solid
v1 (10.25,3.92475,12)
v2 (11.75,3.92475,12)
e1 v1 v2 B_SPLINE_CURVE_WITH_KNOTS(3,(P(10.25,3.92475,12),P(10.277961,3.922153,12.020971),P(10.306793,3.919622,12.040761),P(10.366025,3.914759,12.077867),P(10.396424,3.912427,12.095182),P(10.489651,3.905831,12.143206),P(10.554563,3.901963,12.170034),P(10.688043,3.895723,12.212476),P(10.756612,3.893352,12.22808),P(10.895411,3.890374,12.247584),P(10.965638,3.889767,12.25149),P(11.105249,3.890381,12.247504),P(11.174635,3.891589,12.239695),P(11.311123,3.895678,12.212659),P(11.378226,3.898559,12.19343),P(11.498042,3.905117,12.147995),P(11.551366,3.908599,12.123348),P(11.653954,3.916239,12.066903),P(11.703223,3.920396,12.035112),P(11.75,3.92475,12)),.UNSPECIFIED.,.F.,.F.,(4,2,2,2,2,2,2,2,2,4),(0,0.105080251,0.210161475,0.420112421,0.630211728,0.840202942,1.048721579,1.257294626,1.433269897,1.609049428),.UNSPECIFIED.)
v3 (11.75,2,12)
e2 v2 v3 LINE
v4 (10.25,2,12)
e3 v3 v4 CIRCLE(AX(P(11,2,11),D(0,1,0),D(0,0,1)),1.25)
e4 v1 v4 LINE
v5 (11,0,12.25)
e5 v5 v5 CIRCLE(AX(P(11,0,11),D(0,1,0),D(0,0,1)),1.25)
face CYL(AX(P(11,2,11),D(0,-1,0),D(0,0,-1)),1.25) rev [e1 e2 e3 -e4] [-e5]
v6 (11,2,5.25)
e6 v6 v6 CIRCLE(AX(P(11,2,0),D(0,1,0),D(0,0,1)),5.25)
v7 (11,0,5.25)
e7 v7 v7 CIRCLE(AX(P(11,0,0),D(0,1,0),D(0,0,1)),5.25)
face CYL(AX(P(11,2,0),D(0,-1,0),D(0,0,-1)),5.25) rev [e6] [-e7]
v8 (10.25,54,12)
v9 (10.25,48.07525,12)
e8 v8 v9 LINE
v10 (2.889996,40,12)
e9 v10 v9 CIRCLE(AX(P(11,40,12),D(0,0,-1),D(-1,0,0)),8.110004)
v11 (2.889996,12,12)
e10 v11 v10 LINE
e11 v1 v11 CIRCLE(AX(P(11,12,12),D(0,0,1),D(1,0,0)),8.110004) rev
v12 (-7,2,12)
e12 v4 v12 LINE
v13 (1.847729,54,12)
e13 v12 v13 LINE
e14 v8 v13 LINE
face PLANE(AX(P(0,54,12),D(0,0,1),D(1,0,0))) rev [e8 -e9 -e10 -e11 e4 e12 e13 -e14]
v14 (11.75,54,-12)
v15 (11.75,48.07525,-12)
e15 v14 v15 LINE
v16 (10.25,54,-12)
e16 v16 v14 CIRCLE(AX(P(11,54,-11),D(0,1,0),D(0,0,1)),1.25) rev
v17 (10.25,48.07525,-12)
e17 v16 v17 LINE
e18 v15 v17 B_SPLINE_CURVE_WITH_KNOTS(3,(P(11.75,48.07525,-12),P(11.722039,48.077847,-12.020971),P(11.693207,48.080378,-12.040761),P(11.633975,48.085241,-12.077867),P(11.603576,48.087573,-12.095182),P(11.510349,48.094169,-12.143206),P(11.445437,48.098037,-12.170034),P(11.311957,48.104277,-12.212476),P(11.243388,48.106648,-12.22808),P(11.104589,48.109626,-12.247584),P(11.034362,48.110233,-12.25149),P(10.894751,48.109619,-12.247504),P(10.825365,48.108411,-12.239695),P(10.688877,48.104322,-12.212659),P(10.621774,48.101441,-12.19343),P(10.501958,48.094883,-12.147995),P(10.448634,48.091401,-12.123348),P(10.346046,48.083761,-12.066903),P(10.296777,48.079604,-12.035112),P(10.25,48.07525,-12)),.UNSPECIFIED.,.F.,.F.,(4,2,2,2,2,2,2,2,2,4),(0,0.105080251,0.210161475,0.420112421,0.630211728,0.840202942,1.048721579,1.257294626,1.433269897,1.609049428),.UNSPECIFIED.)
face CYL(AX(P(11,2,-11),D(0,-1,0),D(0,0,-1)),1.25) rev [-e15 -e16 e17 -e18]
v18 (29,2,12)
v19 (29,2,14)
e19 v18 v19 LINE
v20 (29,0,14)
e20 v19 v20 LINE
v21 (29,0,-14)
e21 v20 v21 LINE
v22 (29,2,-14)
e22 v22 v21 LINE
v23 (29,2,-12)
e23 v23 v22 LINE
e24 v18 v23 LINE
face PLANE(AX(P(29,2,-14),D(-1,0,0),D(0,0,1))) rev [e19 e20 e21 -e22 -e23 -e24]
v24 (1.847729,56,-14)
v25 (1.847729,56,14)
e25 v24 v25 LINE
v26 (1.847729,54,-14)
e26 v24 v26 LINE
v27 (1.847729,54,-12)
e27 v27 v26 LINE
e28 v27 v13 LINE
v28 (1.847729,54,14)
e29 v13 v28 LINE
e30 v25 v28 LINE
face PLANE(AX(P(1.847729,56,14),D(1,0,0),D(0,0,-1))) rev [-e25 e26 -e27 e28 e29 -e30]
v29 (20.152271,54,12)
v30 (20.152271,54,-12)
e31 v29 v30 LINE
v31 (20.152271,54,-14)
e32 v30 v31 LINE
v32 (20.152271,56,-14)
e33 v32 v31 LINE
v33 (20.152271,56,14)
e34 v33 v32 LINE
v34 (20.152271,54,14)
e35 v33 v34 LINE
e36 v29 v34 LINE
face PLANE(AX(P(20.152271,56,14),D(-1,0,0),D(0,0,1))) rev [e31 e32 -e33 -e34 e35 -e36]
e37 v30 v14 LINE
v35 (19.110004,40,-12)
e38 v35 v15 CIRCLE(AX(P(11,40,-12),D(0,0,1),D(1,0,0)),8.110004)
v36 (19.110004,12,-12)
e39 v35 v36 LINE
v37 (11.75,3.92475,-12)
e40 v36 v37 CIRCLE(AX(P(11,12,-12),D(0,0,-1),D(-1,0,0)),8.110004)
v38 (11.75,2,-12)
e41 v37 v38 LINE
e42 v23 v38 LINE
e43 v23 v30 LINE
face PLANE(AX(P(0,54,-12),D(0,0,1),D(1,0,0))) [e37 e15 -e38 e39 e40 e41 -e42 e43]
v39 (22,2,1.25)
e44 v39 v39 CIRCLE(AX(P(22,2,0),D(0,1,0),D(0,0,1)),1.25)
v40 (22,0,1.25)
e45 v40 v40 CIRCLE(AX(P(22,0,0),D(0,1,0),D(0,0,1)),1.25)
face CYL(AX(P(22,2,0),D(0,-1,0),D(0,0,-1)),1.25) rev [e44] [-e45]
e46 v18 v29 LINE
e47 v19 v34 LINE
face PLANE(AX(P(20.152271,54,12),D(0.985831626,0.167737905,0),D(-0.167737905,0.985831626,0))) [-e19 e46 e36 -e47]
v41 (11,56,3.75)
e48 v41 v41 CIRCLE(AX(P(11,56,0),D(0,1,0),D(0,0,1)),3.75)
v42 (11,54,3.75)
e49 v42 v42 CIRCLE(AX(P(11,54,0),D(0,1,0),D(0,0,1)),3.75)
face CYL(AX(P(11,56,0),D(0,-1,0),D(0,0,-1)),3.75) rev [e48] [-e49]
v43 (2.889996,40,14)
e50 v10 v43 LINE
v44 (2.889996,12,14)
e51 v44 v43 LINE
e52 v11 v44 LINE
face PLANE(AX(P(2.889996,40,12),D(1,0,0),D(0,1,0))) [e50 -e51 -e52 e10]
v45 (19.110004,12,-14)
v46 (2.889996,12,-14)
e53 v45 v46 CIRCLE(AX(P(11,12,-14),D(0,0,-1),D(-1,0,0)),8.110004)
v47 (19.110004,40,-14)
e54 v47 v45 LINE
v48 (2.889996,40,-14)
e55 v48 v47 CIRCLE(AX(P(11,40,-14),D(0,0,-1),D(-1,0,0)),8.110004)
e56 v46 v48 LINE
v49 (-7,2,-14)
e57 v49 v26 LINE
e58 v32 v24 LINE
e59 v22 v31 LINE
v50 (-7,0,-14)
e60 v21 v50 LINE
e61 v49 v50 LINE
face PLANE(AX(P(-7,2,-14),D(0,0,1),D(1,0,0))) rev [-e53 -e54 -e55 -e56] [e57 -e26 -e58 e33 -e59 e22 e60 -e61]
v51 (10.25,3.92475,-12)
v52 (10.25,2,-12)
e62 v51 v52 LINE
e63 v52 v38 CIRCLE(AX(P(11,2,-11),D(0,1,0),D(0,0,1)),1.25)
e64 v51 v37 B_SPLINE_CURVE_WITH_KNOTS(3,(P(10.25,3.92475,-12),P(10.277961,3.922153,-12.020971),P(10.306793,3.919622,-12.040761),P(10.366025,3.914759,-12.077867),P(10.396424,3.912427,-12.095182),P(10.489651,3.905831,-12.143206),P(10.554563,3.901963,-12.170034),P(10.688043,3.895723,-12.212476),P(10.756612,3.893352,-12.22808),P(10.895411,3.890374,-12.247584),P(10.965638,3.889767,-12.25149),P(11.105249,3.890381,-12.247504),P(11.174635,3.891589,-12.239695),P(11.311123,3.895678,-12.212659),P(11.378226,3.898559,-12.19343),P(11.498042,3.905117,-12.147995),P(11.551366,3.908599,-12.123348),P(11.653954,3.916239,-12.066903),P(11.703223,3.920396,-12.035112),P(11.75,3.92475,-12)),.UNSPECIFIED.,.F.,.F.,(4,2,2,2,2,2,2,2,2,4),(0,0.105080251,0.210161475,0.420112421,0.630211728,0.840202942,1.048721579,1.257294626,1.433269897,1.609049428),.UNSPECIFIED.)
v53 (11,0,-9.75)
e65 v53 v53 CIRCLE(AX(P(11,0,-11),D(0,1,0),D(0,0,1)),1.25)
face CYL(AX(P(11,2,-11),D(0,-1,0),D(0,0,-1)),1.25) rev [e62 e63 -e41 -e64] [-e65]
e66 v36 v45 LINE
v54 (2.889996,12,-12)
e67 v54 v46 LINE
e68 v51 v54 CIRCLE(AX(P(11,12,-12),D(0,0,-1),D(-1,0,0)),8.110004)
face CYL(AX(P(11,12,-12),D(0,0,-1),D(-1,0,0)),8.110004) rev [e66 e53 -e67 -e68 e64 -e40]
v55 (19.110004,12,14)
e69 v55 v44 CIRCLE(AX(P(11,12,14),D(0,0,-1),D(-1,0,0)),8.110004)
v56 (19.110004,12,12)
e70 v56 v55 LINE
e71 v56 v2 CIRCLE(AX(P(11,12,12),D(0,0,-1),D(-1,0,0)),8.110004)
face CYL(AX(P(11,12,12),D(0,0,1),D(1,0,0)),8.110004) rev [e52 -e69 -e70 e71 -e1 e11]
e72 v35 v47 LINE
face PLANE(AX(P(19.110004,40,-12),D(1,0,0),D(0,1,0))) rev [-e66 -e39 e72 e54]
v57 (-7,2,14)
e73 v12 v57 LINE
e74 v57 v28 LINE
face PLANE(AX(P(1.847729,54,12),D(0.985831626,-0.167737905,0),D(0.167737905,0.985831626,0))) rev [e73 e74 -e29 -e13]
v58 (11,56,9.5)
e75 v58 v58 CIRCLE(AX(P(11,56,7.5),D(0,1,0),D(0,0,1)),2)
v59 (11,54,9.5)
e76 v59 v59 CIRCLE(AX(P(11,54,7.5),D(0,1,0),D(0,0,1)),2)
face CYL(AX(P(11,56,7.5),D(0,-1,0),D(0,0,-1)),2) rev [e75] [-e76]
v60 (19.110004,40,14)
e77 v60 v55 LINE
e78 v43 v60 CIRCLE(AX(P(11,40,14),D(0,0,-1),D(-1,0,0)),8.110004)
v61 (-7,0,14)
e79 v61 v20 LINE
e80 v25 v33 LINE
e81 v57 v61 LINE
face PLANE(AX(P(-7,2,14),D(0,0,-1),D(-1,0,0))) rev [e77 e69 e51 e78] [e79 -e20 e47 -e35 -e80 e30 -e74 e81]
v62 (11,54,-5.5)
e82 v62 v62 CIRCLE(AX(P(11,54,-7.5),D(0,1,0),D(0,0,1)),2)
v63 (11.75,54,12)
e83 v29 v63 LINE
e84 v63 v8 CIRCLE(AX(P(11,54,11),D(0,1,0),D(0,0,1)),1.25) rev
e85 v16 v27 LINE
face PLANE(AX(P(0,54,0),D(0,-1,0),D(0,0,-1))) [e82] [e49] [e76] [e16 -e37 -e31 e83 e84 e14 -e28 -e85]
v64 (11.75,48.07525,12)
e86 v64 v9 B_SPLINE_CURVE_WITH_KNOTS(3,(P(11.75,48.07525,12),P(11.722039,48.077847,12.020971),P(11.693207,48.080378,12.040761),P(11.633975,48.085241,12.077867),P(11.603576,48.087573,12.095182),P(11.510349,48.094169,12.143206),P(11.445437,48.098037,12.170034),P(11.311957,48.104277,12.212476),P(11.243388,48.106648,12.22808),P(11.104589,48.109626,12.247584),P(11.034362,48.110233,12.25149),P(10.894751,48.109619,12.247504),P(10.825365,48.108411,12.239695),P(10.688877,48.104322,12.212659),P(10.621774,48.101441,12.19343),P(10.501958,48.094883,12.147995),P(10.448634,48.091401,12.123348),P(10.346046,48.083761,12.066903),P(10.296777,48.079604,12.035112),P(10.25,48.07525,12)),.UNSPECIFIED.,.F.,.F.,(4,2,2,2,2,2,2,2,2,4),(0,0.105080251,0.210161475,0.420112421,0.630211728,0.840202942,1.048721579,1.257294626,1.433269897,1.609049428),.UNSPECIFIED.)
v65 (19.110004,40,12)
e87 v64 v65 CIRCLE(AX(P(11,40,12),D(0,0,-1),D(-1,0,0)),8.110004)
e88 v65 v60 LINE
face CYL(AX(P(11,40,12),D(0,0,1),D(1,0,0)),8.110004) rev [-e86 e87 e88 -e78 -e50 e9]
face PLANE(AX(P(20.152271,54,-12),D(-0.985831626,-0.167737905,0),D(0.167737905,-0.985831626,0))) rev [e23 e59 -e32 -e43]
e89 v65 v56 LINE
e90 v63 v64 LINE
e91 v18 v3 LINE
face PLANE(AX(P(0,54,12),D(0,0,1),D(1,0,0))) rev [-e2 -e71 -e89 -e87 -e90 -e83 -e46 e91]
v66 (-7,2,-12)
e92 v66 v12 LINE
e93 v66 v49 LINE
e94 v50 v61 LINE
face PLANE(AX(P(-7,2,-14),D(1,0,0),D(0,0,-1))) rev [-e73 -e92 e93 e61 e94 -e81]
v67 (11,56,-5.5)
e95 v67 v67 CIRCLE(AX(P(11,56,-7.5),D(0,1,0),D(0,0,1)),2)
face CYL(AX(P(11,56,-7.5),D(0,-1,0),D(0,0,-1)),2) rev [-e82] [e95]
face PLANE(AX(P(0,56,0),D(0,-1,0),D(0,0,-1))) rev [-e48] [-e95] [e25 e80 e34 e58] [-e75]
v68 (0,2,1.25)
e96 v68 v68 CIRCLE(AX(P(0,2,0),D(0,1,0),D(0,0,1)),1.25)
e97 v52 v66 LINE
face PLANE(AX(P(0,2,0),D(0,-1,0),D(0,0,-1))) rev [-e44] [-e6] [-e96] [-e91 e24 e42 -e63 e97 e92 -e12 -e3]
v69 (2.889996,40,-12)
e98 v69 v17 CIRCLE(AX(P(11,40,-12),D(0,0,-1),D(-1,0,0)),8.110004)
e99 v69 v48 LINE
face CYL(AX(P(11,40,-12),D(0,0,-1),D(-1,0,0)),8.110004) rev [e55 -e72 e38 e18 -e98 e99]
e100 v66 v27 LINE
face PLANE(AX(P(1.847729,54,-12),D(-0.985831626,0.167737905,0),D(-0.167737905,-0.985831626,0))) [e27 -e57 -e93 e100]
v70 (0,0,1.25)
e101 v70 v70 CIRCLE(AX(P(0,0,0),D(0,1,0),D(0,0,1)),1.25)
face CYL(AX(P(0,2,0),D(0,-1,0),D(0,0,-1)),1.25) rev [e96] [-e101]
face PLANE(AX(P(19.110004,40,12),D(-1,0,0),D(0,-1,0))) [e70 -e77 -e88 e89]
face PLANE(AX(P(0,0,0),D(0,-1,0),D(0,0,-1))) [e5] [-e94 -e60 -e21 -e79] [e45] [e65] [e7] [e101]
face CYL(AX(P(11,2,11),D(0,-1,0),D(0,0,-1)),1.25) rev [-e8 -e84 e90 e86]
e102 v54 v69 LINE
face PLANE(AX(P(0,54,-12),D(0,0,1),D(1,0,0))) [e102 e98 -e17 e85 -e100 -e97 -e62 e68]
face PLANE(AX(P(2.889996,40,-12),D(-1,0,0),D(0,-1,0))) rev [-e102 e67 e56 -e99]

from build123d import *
from build123d.topology import SkipClean

# Parameters (mm, degrees)
SKETCH1_W            = 36
SKETCH1_H            = 28
SKETCH1_R            = 1.25
SKETCH1_R_2          = 5.25
BOSS_EXTRUDE1_DEPTH  = 2
BOSS_EXTRUDE2_DEPTH  = 52
CUT_EXTRUDE1_DEPTH   = 2
MIRROR2_COPY_1_DEPTH = 2
CUT_EXTRUDE2_DEPTH   = 2
SKETCH6_W            = 18.304542046
SKETCH6_H            = 28
SKETCH6_R            = 3.75
SKETCH6_R_2          = 2
BOSS_EXTRUDE3_DEPTH  = 2


# Read off the part's stored shape, not the designer's step: Boss-Extrude2
with BuildPart() as part:
    # Sketch1 → Boss-Extrude1 (new body)
    with BuildSketch(Plane(origin=(0, 0, 0), x_dir=(1, 0, 0), z_dir=(0, 1, 0))):
        with Locations((11, 0)):
            Rectangle(SKETCH1_W, SKETCH1_H)
        with Locations(Location((0, 0, 0), (0, 0, 270))):
            Circle(SKETCH1_R, mode=Mode.SUBTRACT)
        with Locations(Location((22, 0, 0), (0, 0, 270))):
            Circle(SKETCH1_R, mode=Mode.SUBTRACT)
        with Locations(Location((11, 11, 0), (0, 0, 270))):
            Circle(SKETCH1_R, mode=Mode.SUBTRACT)
        with Locations(Location((11, -11, 0), (0, 0, 270))):
            Circle(SKETCH1_R, mode=Mode.SUBTRACT)
        with Locations(Location((11, 0, 0), (0, 0, 270))):
            Circle(SKETCH1_R_2, mode=Mode.SUBTRACT)
    extrude(amount=BOSS_EXTRUDE1_DEPTH)

    # Boss-Extrude2 outline → Boss-Extrude2 (add)
    with SkipClean():  # the faces are left unmerged after this step: merging them gives an invalid solid
        with BuildSketch(Plane(origin=(0, 2, 0), x_dir=(1, 0, 0), z_dir=(0, 1, 0))):
            with BuildLine():
                Line((29, 14), (-7, 14))
                Line((-7, 14), (-7, 12))
                Line((-7, 12), (10.25, 12))
                ThreePointArc((10.25, 12), (11, 12.25), (11.75, 12))
                Line((11.75, 12), (29, 12))
                Line((29, 12), (29, 14))
            make_face()
            with BuildLine():
                Line((10.25, -12), (-7, -12))
                Line((-7, -12), (-7, -14))
                Line((-7, -14), (29, -14))
                Line((29, -14), (29, -12))
                Line((29, -12), (11.75, -12))
                ThreePointArc((11.75, -12), (11, -12.25), (10.25, -12))
            make_face()
        extrude(amount=BOSS_EXTRUDE2_DEPTH)

    # Sketch5 → Cut-Extrude1 (cut)
    with SkipClean():  # the faces are left unmerged after this step: merging them gives an invalid solid
        with BuildSketch(Plane(origin=(0, 0, -14), x_dir=(-1, 0, 0), z_dir=(0, 0, -1))):
            Polygon((-29, 54), (-20.152271023, 54), (-29, 2), align=None)
        cut_extrude1 = extrude(amount=-CUT_EXTRUDE1_DEPTH, mode=Mode.SUBTRACT)

    # Mirror1: Cut-Extrude1 across plane
    with SkipClean():  # the faces are left unmerged after this step: merging them gives an invalid solid
        add(cut_extrude1.mirror(Plane(origin=(11, 0, 0), x_dir=(0, 0, 1), z_dir=(1, 0, 0))), mode=Mode.SUBTRACT)

    # Mirror2: Cut-Extrude1 across plane
    with SkipClean():  # the faces are left unmerged after this step: merging them gives an invalid solid
        add(cut_extrude1.mirror(Plane(origin=(0, 0, 0), x_dir=(1, 0, 0), z_dir=(0, 0, -1))), mode=Mode.SUBTRACT)

    # Mirror2 copy 1 sketch → Mirror2 copy 1 (cut)
    with SkipClean():  # the faces are left unmerged after this step: merging them gives an invalid solid
        with BuildSketch(Plane(origin=(22, 0, 14), x_dir=(1, 0, 0), z_dir=(0, 0, 1))):
            Polygon((-29, 54), (-20.152271023, 54), (-29, 2), align=None)
        extrude(amount=-MIRROR2_COPY_1_DEPTH, mode=Mode.SUBTRACT)

    # Sketch3 → Cut-Extrude2 (cut)
    with SkipClean():  # the faces are left unmerged after this step: merging them gives an invalid solid
        with BuildSketch(Plane(origin=(0, 0, -14), x_dir=(-1, 0, 0), z_dir=(0, 0, -1))):
            with BuildLine():
                Line((-2.889996266, 40), (-2.889996266, 12))
                ThreePointArc((-2.889996266, 12), (-11, 3.889996266), (-19.110003734, 12))
                Line((-19.110003734, 12), (-19.110003734, 40))
                ThreePointArc((-19.110003734, 40), (-11, 48.110003734), (-2.889996266, 40))
            make_face()
        cut_extrude2 = extrude(amount=-CUT_EXTRUDE2_DEPTH, mode=Mode.SUBTRACT)

    # Mirror3: Cut-Extrude2 across plane
    with SkipClean():  # the faces are left unmerged after this step: merging them gives an invalid solid
        add(cut_extrude2.mirror(Plane(origin=(0, 0, 0), x_dir=(1, 0, 0), z_dir=(0, 0, -1))), mode=Mode.SUBTRACT)

    # Sketch6 → Boss-Extrude3 (add)
    with SkipClean():  # the faces are left unmerged after this step: merging them gives an invalid solid
        with BuildSketch(Plane(origin=(0, 54, 0), x_dir=(1, 0, 0), z_dir=(0, 1, 0))):
            with Locations((11, 0)):
                Rectangle(SKETCH6_W, SKETCH6_H)
            with Locations(Location((11, 0, 0), (0, 0, 270))):
                Circle(SKETCH6_R, mode=Mode.SUBTRACT)
            with Locations(Location((11, -7.5, 0), (0, 0, 270))):
                Circle(SKETCH6_R_2, mode=Mode.SUBTRACT)
            with Locations(Location((11, 7.5, 0), (0, 0, 270))):
                Circle(SKETCH6_R_2, mode=Mode.SUBTRACT)
        extrude(amount=BOSS_EXTRUDE3_DEPTH)


solid = part.part
